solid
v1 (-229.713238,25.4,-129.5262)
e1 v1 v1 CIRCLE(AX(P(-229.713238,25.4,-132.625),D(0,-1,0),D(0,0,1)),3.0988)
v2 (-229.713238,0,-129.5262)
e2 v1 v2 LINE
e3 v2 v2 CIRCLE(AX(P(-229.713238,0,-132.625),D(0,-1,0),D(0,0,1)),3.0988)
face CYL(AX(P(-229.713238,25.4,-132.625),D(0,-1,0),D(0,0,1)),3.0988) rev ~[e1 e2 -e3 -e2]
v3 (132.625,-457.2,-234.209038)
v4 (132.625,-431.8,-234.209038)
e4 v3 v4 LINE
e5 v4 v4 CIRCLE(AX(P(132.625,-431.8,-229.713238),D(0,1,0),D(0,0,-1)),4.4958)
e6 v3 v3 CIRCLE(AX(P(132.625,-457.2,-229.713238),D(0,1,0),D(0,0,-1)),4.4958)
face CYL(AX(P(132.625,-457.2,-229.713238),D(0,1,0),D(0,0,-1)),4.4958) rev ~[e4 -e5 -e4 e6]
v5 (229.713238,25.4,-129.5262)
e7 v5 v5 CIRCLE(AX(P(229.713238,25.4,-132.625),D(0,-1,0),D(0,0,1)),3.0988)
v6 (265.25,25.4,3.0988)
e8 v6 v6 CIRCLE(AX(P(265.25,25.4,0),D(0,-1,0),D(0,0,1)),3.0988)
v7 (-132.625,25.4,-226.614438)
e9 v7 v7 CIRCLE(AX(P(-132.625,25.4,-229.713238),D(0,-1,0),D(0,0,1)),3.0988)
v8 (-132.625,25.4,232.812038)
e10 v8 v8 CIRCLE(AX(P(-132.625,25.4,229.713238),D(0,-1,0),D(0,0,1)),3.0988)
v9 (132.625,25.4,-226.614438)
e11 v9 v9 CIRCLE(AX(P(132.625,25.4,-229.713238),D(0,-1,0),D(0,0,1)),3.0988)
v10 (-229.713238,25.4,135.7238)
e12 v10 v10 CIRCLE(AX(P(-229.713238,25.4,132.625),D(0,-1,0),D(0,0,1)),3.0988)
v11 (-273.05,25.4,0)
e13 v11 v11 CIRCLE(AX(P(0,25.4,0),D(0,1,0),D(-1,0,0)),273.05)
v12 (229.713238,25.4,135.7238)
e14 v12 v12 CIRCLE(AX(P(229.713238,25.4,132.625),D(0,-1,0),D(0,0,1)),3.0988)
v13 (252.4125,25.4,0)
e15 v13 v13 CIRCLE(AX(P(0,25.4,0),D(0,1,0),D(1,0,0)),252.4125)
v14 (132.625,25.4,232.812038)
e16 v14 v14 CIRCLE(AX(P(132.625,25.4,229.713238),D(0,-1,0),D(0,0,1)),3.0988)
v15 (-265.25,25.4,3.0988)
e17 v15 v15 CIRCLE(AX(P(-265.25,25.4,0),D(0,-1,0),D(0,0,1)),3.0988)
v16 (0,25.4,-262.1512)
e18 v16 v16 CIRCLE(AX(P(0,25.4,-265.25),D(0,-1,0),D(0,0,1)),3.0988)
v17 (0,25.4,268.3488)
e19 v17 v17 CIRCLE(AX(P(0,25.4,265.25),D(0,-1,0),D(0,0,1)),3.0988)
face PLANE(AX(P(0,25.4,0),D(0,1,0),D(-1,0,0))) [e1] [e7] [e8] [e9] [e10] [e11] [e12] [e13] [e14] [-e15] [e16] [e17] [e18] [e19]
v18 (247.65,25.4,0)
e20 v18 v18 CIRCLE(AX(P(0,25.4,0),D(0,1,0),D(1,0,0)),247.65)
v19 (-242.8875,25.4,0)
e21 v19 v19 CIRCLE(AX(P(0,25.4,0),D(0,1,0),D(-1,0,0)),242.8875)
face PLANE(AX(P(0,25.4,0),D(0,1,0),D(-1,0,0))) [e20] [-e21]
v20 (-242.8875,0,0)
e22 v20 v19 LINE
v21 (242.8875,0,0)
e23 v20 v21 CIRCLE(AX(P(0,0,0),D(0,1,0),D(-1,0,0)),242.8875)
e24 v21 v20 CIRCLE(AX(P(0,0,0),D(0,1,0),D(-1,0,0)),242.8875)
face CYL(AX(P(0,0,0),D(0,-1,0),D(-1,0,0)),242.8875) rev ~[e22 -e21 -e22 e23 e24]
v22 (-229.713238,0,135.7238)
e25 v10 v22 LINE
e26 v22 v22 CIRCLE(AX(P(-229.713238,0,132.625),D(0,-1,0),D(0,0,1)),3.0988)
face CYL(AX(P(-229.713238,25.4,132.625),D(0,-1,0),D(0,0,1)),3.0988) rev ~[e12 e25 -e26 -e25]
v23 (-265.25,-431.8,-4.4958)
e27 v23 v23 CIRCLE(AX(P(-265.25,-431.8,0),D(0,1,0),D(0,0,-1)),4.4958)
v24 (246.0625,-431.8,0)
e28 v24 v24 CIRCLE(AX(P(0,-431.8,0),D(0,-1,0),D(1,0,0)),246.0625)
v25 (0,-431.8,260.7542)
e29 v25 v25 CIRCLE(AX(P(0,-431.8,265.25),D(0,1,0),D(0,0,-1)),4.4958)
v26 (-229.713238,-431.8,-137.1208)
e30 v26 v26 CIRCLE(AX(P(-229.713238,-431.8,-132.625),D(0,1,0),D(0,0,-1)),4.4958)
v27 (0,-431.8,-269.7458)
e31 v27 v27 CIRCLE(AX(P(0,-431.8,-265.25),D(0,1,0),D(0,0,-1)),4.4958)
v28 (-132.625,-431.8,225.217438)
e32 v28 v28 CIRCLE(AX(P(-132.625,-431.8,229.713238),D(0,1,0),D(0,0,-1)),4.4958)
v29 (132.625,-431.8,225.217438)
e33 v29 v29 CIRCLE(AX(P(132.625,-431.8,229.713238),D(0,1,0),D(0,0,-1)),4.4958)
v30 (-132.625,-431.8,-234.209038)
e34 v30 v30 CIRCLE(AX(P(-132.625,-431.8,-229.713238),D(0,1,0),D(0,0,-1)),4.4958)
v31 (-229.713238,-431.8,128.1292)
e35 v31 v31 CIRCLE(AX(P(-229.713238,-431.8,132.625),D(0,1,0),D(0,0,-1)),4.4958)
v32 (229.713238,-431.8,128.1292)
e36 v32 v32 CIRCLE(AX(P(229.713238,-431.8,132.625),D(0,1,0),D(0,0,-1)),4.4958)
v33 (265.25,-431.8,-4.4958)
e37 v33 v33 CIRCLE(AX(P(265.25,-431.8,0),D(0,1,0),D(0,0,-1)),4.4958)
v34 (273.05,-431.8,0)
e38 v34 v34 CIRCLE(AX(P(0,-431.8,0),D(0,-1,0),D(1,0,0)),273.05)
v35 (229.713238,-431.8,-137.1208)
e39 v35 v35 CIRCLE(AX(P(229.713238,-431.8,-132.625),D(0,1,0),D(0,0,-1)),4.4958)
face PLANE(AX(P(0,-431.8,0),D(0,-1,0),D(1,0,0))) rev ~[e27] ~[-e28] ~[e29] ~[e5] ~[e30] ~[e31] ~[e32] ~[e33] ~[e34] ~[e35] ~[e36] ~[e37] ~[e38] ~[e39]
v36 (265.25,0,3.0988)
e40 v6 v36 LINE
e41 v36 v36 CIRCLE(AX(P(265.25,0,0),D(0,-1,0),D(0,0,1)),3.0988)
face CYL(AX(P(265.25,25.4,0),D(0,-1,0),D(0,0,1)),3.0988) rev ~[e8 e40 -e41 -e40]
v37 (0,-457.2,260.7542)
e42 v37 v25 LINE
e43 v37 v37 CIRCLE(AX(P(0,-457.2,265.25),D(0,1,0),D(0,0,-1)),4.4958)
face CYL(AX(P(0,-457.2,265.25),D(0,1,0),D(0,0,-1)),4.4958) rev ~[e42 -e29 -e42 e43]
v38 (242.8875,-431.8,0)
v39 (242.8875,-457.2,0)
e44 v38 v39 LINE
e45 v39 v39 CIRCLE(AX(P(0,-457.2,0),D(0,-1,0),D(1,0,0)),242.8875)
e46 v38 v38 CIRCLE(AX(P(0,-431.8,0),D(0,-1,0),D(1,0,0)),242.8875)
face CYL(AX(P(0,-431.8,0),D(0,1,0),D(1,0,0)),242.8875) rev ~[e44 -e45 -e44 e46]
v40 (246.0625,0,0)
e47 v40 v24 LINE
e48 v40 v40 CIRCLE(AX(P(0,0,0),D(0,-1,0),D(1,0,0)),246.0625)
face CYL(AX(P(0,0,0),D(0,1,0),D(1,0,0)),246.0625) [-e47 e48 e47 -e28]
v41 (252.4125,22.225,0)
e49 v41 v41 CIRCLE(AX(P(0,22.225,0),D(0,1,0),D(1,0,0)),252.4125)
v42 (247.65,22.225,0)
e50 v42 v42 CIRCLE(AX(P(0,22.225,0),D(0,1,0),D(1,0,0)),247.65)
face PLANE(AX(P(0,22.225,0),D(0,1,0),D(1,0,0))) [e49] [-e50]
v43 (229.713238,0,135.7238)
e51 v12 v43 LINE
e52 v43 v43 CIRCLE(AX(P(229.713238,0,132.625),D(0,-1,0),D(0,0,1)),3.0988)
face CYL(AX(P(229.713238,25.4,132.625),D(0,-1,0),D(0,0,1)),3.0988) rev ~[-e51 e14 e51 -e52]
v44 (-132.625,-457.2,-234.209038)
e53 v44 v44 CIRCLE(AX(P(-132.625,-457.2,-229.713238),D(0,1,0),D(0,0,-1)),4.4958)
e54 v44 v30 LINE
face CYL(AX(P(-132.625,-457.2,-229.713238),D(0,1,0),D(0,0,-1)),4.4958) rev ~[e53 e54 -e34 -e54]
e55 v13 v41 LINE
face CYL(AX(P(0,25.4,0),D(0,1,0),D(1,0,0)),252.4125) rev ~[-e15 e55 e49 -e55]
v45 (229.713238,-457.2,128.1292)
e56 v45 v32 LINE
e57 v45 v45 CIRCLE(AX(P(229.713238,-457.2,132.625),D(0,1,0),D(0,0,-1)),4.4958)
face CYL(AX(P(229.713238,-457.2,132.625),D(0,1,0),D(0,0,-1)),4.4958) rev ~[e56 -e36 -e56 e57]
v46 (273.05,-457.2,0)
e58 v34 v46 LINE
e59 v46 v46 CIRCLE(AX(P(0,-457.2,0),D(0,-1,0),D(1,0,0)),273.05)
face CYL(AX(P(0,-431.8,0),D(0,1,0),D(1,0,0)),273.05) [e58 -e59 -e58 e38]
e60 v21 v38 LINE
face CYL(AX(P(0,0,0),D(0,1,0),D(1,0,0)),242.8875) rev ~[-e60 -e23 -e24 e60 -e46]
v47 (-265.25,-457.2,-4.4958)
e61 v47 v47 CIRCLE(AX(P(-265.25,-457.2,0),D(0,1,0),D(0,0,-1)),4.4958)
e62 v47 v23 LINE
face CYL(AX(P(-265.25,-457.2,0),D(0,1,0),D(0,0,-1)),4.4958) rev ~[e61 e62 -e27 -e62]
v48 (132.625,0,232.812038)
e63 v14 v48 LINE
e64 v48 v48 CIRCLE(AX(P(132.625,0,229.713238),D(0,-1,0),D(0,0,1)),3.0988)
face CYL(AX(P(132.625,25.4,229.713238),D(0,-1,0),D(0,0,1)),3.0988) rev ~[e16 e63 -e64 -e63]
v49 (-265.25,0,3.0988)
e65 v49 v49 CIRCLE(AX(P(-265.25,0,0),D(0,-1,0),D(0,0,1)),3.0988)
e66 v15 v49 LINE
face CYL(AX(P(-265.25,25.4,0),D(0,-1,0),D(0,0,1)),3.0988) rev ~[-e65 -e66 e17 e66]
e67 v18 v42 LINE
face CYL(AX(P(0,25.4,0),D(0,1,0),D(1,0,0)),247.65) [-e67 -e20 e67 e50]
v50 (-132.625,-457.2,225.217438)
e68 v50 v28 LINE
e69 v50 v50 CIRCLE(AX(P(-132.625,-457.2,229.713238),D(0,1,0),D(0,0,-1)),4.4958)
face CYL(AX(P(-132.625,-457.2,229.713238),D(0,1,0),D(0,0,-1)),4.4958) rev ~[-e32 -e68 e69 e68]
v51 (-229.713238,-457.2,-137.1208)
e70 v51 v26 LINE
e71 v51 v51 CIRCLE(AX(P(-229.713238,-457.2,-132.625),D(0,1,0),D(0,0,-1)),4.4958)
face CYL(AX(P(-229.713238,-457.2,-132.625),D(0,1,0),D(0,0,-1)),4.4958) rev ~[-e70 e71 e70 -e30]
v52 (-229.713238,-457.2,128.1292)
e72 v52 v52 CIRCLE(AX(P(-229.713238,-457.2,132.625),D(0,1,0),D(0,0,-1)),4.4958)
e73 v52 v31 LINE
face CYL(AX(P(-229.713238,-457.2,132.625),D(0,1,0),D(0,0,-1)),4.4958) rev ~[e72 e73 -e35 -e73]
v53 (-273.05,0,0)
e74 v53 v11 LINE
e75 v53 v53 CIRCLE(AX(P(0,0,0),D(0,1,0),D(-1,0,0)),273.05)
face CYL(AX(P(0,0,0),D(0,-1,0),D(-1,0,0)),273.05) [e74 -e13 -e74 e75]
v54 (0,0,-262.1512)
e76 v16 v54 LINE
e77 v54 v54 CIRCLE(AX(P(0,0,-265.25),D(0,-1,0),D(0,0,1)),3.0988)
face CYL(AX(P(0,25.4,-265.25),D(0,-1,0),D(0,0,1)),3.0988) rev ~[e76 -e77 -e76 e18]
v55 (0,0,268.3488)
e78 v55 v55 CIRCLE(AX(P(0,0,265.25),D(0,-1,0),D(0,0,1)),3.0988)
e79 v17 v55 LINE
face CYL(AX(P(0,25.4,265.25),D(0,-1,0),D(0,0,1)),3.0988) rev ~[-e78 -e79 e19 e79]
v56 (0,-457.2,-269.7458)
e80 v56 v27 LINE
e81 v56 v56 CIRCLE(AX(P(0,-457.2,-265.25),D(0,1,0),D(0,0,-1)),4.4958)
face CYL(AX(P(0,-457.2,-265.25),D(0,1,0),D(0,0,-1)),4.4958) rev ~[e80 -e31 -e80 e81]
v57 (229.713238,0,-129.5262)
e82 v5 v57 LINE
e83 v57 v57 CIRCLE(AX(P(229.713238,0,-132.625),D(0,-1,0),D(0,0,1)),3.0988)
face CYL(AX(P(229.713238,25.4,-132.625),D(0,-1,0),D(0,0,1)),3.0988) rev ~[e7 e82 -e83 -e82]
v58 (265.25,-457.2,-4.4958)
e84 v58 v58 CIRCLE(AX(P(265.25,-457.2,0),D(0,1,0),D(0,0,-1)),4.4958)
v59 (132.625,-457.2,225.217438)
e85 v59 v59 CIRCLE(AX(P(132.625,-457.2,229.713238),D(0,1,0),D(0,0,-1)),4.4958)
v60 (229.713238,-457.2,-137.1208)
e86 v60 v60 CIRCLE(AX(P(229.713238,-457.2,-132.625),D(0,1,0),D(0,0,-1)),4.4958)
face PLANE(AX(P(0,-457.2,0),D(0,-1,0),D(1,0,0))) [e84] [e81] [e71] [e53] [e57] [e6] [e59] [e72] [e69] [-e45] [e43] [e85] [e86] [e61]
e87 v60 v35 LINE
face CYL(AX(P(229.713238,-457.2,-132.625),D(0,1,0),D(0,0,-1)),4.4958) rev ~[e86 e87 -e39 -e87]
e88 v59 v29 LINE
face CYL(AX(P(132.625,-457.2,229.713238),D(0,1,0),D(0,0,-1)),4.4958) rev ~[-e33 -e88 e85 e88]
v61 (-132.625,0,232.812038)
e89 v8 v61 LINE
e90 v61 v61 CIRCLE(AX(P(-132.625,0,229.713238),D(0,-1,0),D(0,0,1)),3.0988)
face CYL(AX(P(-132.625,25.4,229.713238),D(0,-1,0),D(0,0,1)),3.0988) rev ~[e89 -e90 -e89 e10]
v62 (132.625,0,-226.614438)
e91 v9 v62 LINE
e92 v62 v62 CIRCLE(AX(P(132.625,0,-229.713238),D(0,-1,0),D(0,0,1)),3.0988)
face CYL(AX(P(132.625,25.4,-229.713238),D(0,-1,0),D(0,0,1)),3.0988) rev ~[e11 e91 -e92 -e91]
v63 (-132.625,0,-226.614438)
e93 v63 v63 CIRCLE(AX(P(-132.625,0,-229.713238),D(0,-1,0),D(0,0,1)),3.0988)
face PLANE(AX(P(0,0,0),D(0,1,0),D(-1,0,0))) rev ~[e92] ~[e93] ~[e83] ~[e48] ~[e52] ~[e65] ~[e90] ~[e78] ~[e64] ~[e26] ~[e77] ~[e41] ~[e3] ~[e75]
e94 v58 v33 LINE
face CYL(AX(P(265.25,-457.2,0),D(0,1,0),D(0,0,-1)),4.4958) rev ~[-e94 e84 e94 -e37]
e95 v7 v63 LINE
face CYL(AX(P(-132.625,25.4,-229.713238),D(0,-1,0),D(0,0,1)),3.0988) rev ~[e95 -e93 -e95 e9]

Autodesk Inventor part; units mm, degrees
ref_plane "YZ Plane" through (0, 0, 0) normal (1, 0, 0) x (0, 1, 0)
ref_plane "XZ Plane" through (0, 0, 0) normal (0, 1, 0) x (-1, 0, 0)
ref_plane "XY Plane" through (0, 0, 0) normal (0, 0, 1) x (1, 0, 0)
sketch "Sketch1" plane through (0, 0, 0) normal (0, 1, 0) x (-1, 0, 0)
  circle A0 centre (0, 0) radius 273.05
  circle A1 centre (0, 0) radius 242.8875
  dimension "d0" = 546.1
  dimension "d1" = 485.775
extrude "Extrusion1" add sketch "Sketch1" along normal blind 25.4
sketch "Sketch2" plane through (0, 25.4, 0) normal (0, 1, 0) x (1, 0, 0)
  circle A0 centre (0, 0) radius 247.65
  circle A1 centre (0, 0) radius 252.4125
  dimension "d4" = 495.3
  dimension "d5" = 504.825
extrude "Extrusion2" cut sketch "Sketch2" against normal blind 3.175
sketch "Sketch3" plane through (0, 25.4, 0) normal (0, 1, 0) x (1, 0, 0)
  line L0 (0, 0) -> (-265.25, 0) construction
  dimension "d8" = 265.25
hole "Hole1" at (-265.25, 25.4, 0) direction (0, -1, 0) diameter 6.1976 end up to surface
pattern_circular "Circular Pattern1" count 12 over 360 about axis through (0, -10, 0) along (0, 1, 0) of "Hole1"
sketch "Sketch4" plane through (0, 0, 0) normal (0, -1, 0) x (1, 0, 0)
  circle A0 centre (0, 0) radius 242.8875
  circle A1 centre (0, 0) radius 246.0625
  dimension "d19" = 485.775
  dimension "d20" = 492.125
extrude "Extrusion3" add sketch "Sketch4" along normal blind 431.8
sketch "Sketch5" plane through (0, -431.8, 0) normal (0, -1, 0) x (1, 0, 0)
  circle A0 centre (0, 0) radius 273.05
  circle A1 centre (0, 0) radius 242.8875
  dimension "d24" = 546.1
  dimension "d23" = 485.775
extrude "Extrusion4" add sketch "Sketch5" along normal blind 25.4
sketch "Sketch7" plane through (0, -457.2, 0) normal (0, -1, 0) x (-1, 0, 0)
  line L0 (0, 0) -> (-265.25, 0) construction
  dimension "d34" = 265.25
hole "Hole2" at (265.25, -457.2, 0) direction (0, 1, 0) diameter 8.9916 end up to surface clearance for "Hex Head Cap Screw" size "M8" standard "Ansi Metric M Profile"
pattern_circular "Circular Pattern2" count 12 over 360 about axis through (0, 0, 0) along (0, -1, 0) of "Hole2"
properties part number "vacuum jacket"
